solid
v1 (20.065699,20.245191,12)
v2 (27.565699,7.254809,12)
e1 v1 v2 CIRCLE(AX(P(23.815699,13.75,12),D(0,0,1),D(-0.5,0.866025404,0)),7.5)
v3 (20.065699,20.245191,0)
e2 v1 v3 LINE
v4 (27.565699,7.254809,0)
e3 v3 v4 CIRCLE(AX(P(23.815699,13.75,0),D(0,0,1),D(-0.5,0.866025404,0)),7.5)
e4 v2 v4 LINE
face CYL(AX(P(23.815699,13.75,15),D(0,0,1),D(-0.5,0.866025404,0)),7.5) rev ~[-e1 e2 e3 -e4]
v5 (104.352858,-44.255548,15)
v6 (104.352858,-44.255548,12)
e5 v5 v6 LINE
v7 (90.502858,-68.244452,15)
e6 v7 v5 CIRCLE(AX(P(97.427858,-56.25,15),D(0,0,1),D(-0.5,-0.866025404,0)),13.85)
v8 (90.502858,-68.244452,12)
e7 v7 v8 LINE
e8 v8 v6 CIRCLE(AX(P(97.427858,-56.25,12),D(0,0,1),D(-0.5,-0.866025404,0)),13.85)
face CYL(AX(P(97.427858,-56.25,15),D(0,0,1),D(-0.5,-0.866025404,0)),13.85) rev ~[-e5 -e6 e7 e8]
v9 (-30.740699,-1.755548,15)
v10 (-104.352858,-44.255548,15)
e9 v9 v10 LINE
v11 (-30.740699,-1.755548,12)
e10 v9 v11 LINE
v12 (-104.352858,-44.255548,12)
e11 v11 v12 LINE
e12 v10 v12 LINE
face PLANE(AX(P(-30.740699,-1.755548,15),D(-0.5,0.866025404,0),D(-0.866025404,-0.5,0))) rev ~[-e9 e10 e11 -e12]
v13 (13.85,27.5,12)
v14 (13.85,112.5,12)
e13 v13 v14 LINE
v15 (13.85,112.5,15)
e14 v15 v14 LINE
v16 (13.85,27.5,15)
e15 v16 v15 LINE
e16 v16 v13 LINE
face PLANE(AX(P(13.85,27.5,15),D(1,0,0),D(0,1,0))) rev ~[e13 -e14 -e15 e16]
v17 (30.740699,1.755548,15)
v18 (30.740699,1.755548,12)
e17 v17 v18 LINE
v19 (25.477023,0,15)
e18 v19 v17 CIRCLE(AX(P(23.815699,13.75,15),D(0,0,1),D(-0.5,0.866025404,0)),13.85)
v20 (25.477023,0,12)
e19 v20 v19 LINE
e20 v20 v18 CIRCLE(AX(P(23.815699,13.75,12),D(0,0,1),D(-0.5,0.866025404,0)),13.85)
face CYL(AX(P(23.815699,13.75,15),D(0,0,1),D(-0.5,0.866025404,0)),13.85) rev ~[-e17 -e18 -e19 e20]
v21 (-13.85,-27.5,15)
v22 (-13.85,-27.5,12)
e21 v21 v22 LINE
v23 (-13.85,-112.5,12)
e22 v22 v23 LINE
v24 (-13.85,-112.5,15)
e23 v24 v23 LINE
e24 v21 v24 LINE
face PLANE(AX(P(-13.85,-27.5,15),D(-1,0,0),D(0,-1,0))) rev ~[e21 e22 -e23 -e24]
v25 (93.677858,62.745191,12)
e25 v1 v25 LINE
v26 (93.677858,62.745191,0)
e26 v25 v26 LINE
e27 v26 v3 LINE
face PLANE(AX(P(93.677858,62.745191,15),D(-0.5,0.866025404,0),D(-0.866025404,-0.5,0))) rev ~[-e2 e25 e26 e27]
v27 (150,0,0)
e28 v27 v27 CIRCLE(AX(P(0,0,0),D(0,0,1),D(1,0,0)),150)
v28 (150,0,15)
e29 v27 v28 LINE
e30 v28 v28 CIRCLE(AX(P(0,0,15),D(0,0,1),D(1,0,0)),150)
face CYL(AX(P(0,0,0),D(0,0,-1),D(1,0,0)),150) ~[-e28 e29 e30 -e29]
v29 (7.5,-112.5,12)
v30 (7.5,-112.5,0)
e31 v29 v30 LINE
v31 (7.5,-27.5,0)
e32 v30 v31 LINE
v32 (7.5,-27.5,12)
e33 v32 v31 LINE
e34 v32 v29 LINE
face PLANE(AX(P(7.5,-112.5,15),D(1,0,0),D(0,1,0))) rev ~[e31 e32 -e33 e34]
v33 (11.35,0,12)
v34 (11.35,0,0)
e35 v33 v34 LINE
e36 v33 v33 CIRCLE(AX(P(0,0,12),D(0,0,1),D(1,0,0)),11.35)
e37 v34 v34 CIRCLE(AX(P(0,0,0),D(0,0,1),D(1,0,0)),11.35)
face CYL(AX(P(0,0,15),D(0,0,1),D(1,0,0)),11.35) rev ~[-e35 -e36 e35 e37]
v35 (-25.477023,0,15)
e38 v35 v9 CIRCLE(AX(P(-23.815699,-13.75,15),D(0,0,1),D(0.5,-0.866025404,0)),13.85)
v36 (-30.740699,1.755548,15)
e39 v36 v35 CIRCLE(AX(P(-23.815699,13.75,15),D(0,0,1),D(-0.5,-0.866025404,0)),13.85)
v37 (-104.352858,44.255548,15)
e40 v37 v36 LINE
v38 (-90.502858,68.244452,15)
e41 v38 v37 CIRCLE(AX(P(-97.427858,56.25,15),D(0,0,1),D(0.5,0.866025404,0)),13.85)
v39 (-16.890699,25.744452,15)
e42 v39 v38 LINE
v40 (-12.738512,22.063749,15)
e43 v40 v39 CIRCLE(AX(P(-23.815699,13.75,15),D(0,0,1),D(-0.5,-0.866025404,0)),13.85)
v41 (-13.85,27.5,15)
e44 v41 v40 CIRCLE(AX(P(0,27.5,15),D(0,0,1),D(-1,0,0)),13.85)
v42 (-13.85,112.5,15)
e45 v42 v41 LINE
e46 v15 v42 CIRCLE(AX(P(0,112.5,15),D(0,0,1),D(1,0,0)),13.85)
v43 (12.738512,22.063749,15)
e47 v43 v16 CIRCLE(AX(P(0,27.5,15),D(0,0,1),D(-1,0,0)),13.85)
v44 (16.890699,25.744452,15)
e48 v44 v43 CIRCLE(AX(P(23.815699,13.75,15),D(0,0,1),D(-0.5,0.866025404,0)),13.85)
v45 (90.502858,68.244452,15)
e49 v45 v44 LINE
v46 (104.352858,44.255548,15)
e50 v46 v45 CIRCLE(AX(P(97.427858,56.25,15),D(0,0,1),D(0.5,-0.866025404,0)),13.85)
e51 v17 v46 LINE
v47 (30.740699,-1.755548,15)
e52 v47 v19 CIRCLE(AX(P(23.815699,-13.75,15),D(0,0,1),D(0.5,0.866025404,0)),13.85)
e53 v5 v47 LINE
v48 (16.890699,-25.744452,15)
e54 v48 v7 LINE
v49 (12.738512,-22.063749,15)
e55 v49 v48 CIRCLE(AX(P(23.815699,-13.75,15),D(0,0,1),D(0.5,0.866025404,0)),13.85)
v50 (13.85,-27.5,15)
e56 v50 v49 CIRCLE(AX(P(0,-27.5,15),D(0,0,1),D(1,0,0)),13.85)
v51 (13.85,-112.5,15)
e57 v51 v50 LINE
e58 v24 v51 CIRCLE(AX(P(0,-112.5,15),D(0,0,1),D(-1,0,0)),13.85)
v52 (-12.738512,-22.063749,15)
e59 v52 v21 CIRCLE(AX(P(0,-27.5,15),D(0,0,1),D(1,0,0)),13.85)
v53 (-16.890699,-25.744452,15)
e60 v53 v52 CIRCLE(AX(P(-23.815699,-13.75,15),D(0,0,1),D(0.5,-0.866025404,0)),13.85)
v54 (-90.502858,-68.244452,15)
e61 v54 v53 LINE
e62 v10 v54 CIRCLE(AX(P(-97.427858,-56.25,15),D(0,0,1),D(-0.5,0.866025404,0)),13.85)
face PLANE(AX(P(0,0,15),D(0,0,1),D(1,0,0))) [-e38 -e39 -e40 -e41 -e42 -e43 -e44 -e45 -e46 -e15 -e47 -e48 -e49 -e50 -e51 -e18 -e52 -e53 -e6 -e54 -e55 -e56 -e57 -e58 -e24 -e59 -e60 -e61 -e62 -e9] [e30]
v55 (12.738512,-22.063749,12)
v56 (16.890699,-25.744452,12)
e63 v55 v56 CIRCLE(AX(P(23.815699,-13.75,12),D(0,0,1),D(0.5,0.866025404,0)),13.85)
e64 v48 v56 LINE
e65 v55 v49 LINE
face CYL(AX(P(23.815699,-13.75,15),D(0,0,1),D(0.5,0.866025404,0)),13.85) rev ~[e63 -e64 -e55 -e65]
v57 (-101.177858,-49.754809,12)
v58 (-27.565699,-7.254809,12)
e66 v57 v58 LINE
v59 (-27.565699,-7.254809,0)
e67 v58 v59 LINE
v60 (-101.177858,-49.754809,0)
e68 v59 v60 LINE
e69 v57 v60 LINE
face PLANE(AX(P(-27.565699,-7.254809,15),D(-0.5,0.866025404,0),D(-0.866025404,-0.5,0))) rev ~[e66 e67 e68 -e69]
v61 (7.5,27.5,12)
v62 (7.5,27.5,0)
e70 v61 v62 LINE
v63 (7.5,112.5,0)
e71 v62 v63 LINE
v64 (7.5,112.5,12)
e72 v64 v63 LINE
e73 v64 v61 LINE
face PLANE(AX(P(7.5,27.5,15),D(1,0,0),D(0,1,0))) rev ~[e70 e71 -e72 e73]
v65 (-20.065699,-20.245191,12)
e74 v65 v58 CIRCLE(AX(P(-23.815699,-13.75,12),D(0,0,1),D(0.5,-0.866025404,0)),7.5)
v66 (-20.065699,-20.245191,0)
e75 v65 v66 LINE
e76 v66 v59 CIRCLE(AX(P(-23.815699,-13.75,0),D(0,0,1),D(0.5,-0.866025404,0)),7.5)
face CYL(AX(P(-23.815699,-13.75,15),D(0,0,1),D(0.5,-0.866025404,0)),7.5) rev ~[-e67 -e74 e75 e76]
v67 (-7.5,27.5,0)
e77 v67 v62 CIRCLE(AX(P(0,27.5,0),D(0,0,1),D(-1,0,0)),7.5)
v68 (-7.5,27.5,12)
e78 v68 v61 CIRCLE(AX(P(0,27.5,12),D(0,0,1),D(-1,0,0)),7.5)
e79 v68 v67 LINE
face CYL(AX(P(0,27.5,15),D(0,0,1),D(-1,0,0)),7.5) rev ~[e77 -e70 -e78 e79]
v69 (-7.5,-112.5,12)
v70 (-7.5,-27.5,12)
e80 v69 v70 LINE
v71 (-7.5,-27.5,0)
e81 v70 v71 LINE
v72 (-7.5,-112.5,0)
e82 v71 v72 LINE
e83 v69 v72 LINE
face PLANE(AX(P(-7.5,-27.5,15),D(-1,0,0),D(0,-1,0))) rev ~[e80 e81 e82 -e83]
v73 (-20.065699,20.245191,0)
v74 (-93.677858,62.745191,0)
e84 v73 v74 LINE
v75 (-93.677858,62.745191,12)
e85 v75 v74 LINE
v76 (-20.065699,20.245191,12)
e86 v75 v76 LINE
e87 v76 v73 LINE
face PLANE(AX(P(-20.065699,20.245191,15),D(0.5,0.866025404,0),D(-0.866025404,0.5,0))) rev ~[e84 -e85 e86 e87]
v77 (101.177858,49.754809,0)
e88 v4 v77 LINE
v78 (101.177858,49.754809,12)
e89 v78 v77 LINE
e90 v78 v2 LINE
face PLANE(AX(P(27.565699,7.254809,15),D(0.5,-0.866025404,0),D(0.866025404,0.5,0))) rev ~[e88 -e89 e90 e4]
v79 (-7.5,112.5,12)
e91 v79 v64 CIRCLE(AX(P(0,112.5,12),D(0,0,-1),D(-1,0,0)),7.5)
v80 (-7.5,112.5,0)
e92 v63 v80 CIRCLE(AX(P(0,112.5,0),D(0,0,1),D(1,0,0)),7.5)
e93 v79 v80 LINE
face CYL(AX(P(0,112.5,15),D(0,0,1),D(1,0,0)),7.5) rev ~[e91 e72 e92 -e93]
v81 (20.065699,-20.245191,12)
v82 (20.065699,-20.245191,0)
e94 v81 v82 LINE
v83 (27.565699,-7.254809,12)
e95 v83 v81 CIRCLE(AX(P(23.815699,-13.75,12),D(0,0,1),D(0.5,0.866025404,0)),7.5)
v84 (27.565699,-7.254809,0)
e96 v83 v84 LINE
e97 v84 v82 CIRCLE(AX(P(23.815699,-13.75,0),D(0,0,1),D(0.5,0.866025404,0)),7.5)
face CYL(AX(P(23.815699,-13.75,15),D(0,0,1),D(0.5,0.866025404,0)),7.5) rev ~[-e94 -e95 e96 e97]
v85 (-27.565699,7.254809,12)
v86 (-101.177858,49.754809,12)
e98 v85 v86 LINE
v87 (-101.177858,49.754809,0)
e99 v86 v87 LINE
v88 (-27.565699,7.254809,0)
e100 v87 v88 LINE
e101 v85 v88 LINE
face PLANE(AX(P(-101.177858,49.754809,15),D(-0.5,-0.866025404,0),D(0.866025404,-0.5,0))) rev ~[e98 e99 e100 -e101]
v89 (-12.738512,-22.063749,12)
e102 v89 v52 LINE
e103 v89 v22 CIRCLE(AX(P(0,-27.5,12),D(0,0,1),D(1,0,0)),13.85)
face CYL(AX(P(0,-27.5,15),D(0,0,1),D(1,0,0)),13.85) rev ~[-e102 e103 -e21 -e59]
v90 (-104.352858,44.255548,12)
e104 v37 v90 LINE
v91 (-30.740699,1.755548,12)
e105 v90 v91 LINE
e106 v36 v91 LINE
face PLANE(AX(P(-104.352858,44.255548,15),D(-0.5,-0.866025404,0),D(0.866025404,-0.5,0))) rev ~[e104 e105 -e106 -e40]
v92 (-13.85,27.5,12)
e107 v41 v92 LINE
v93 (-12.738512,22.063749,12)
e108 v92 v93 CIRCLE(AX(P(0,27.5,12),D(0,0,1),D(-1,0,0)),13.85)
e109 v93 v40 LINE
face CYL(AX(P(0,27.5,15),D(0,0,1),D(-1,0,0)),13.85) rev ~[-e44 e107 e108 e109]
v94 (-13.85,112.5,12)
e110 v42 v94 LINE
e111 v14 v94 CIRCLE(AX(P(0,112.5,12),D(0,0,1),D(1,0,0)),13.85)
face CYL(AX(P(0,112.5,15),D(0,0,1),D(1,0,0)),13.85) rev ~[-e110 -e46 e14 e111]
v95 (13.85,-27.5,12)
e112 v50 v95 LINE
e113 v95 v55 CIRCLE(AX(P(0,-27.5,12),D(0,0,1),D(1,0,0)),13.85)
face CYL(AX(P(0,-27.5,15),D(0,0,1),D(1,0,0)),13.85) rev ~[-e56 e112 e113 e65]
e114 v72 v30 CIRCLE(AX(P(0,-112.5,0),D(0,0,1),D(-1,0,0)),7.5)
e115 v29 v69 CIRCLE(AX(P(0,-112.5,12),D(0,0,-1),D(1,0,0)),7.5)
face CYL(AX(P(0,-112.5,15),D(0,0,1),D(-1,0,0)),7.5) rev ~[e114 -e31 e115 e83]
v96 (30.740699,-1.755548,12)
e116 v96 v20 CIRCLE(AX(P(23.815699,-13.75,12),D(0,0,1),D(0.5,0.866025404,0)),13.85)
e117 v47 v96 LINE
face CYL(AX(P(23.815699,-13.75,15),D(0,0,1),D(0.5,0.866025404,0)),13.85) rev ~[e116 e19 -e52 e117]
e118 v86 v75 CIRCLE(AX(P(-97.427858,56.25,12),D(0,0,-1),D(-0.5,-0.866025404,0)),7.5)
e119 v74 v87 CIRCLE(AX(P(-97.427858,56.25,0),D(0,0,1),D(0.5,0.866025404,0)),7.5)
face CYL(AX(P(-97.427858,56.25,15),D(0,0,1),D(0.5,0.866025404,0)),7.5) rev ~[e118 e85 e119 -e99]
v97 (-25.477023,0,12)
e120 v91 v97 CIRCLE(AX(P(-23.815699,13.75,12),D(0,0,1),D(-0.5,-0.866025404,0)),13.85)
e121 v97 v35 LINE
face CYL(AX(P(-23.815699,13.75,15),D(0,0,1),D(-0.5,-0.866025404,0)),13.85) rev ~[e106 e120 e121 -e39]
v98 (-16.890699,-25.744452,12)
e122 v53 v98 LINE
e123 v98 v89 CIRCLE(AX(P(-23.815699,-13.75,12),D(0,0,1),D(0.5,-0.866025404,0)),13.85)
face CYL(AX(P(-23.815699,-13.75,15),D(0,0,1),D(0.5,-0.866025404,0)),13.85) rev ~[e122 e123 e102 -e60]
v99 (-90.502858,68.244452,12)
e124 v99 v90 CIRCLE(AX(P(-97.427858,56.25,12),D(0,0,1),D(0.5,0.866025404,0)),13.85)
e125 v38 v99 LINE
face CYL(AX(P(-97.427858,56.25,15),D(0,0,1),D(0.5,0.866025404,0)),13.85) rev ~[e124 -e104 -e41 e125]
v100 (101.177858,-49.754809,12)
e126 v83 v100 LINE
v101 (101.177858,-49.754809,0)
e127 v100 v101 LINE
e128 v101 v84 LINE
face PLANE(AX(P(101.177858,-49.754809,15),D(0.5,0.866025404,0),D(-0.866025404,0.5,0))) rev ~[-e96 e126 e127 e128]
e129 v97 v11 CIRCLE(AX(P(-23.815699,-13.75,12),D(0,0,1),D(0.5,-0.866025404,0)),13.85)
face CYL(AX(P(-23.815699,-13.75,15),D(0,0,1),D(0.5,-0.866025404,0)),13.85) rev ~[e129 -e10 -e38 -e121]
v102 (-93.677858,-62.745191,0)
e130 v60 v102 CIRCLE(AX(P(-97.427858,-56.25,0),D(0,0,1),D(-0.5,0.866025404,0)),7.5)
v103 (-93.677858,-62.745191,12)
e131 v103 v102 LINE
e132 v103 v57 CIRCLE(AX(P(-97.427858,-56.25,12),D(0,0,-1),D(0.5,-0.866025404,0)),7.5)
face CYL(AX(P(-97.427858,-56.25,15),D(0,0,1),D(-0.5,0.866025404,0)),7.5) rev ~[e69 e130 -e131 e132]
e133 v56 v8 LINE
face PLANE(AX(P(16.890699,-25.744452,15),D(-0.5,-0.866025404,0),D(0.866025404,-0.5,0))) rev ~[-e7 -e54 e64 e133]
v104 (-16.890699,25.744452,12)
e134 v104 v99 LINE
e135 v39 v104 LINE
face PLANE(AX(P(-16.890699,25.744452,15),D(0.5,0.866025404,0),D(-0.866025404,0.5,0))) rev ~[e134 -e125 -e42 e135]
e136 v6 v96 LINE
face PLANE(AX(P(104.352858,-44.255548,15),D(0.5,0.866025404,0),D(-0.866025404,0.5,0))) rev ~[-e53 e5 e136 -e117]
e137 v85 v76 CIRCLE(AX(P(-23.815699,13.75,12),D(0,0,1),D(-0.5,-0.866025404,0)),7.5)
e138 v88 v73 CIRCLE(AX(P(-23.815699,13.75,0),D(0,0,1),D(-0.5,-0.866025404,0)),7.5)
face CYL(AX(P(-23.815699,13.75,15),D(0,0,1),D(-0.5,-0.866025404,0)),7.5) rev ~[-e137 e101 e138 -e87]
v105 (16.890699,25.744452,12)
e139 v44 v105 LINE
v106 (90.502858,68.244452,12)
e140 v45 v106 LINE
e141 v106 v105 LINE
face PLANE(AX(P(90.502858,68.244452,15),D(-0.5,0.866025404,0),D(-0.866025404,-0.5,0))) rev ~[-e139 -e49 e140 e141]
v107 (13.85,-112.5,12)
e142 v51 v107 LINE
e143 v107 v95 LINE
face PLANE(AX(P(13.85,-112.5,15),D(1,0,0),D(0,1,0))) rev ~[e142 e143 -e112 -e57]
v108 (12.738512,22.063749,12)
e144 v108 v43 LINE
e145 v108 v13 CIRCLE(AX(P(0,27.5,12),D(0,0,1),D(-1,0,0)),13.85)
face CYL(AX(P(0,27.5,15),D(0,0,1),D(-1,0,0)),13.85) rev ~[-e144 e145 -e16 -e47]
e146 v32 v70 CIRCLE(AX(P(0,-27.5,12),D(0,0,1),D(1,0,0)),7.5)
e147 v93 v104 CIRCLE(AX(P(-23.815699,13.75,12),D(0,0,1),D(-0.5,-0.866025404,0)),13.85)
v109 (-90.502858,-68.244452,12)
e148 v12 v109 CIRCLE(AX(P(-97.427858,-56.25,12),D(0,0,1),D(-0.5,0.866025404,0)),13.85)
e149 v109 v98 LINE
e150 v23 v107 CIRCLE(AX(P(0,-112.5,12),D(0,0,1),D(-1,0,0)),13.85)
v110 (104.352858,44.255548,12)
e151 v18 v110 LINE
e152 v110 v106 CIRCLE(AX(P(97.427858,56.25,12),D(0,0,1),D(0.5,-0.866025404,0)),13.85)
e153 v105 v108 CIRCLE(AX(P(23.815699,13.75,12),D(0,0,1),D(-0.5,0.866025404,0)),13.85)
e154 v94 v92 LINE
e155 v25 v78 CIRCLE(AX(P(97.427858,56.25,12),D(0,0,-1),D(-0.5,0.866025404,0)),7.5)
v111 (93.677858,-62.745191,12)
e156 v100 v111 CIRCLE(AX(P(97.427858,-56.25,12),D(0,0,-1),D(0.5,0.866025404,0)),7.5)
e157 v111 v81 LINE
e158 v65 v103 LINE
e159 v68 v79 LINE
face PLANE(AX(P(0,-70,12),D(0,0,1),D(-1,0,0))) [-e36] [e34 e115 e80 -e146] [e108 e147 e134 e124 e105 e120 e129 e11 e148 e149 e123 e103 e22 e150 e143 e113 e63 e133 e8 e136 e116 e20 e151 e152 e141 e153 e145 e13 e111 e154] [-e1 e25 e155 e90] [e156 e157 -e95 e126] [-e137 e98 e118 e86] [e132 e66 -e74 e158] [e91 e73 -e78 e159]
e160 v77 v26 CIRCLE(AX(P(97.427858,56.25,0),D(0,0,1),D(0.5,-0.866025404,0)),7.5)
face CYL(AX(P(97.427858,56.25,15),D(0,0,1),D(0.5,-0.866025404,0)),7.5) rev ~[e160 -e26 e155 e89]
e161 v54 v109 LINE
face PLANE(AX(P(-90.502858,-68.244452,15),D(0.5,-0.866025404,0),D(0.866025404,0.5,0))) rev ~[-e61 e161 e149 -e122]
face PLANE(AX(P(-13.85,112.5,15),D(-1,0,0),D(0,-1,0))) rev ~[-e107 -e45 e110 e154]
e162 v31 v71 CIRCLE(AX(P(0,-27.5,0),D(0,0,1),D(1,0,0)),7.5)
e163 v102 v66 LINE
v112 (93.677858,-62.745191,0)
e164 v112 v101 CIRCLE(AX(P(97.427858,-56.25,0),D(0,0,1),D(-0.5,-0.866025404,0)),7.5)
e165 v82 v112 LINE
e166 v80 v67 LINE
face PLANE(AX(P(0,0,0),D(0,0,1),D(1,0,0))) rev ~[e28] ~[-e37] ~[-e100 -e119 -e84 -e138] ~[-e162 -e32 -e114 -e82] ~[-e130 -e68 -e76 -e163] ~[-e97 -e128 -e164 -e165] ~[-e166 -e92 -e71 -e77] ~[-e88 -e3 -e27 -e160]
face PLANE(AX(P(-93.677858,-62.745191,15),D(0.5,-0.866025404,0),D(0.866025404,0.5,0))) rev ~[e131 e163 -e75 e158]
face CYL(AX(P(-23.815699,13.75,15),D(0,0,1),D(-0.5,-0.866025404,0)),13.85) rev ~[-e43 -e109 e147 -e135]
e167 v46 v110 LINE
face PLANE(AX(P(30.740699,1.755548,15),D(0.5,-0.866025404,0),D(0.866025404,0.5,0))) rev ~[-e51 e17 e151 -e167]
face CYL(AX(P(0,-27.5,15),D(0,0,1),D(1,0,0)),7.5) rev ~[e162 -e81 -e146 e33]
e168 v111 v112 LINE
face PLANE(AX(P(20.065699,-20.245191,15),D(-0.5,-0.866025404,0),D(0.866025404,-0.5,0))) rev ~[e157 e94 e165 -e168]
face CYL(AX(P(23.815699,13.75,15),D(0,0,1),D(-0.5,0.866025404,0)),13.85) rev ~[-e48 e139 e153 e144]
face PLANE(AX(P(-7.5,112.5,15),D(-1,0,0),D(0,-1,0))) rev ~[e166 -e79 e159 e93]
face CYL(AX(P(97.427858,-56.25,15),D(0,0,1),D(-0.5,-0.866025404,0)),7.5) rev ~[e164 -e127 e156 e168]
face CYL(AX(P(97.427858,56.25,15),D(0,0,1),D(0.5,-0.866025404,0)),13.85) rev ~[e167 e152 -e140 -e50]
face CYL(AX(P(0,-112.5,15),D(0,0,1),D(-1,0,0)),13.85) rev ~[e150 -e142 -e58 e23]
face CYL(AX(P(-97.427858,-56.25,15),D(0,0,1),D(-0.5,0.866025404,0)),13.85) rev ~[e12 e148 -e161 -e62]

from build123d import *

# Parameters (mm, degrees)
F0_R            = 150
F1_DEPTH        = 15
F3_DEPTH        = 15.001
F3_COPIES_COUNT = 6
F5_DEPTH        = 3
F5_COPIES_COUNT = 6
F6_R            = 25
F6_R_2          = 11.35
F7_DEPTH        = 3
F8_DEPTH        = 15.001


# Not quite as in the source:
# - an extrude ends at something that could not be found from the text; its depth is read off the source's solid
# - a pattern or mirror of a feature is missing from the dataset's text; its kind, count and spacing are read off the source's solid


with BuildPart() as f1:
    # F0 (on Top) → F1 (new body)
    with BuildSketch(Plane.XY):
        Circle(F0_R)
    extrude(amount=F1_DEPTH)

    # F2 (on face) → F3 (cut, through all)
    with BuildSketch(Plane.XY.offset(15)):
        with BuildLine():
            ThreePointArc((0, 120), (-5.3033008589, 117.8033008589), (-7.5, 112.5))
            Line((-7.5, 112.5), (-7.5, 27.5))
            ThreePointArc((-7.5, 27.5), (-5.3033008589, 22.1966991411), (0, 20))
            Line((0, 20), (0, 120))
        make_face()
        with BuildLine():
            ThreePointArc((7.5, 112.5), (5.3033008589, 117.8033008589), (0, 120))
            Line((0, 120), (0, 20))
            ThreePointArc((0, 20), (5.3033008589, 22.1966991411), (7.5, 27.5))
            Line((7.5, 27.5), (7.5, 112.5))
        make_face()
    f3 = extrude(amount=-F3_DEPTH, mode=Mode.SUBTRACT)

    # F3_copies: F3 ×6 about axis
    f3_copies_axis = Axis((0, 0, 0), (0, 0, 1))
    for i in range(1, F3_COPIES_COUNT):
        add(f3.rotate(f3_copies_axis, i * 360 / F3_COPIES_COUNT), mode=Mode.SUBTRACT)

    # F4 (on face) → F5 (cut)
    with BuildSketch(Plane.XY.offset(15)):
        with BuildLine():
            Line((13.85, 27.5), (13.85, 112.5))
            ThreePointArc((13.85, 112.5), (0, 126.35), (-13.85, 112.5))
            Line((-13.85, 112.5), (-13.85, 27.5))
            ThreePointArc((-13.85, 27.5), (0, 13.65), (13.85, 27.5))
        make_face()
        with BuildLine():
            Line((7.5, 112.5), (7.5, 27.5))
            ThreePointArc((7.5, 27.5), (0, 20), (-7.5, 27.5))
            Line((-7.5, 27.5), (-7.5, 112.5))
            ThreePointArc((-7.5, 112.5), (0, 120), (7.5, 112.5))
        make_face(mode=Mode.SUBTRACT)
    f5 = extrude(amount=-F5_DEPTH, mode=Mode.SUBTRACT)

    # F5_copies: F5 ×6 about axis
    f5_copies_axis = Axis((0, 0, 0), (0, 0, 1))
    for i in range(1, F5_COPIES_COUNT):
        add(f5.rotate(f5_copies_axis, i * 360 / F5_COPIES_COUNT), mode=Mode.SUBTRACT)

    # F6 (on face) → F7 (cut, through all)
    with BuildSketch(Plane.XY.offset(15)):
        Circle(F6_R)
        with BuildLine():
            ThreePointArc((11.0771869157, 19.186250543), (11.8212467617, 6.825), (22.1543738315, 0))
            ThreePointArc((22.1543738315, 0), (11.8212467617, -6.825), (11.0771869157, -19.186250543))
            ThreePointArc((11.0771869157, -19.186250543), (0, -13.65), (-11.0771869157, -19.186250543))
            ThreePointArc((-11.0771869157, -19.186250543), (-11.8212467617, -6.825), (-22.1543738315, 0))
            ThreePointArc((-22.1543738315, 0), (-11.8212467617, 6.825), (-11.0771869157, 19.186250543))
            ThreePointArc((-11.0771869157, 19.186250543), (0, 13.65), (11.0771869157, 19.186250543))
        make_face(mode=Mode.SUBTRACT)
        with BuildLine():
            ThreePointArc((11.0771869157, -19.186250543), (11.8212467617, -6.825), (22.1543738315, 0))
            ThreePointArc((22.1543738315, 0), (11.8212467617, 6.825), (11.0771869157, 19.186250543))
            ThreePointArc((11.0771869157, 19.186250543), (0, 13.65), (-11.0771869157, 19.186250543))
            ThreePointArc((-11.0771869157, 19.186250543), (-11.8212467617, 6.825), (-22.1543738315, 0))
            ThreePointArc((-22.1543738315, 0), (-11.8212467617, -6.825), (-11.0771869157, -19.186250543))
            ThreePointArc((-11.0771869157, -19.186250543), (0, -13.65), (11.0771869157, -19.186250543))
        make_face()
        Circle(F6_R_2, mode=Mode.SUBTRACT)
        Circle(F6_R_2)
    extrude(amount=-F7_DEPTH, mode=Mode.SUBTRACT)

    # F6 (on face) → F8 (cut, through all)
    with BuildSketch(Plane.XY.offset(15)):
        Circle(F6_R_2)
    extrude(amount=-F8_DEPTH, mode=Mode.SUBTRACT)


solid = f1.part
